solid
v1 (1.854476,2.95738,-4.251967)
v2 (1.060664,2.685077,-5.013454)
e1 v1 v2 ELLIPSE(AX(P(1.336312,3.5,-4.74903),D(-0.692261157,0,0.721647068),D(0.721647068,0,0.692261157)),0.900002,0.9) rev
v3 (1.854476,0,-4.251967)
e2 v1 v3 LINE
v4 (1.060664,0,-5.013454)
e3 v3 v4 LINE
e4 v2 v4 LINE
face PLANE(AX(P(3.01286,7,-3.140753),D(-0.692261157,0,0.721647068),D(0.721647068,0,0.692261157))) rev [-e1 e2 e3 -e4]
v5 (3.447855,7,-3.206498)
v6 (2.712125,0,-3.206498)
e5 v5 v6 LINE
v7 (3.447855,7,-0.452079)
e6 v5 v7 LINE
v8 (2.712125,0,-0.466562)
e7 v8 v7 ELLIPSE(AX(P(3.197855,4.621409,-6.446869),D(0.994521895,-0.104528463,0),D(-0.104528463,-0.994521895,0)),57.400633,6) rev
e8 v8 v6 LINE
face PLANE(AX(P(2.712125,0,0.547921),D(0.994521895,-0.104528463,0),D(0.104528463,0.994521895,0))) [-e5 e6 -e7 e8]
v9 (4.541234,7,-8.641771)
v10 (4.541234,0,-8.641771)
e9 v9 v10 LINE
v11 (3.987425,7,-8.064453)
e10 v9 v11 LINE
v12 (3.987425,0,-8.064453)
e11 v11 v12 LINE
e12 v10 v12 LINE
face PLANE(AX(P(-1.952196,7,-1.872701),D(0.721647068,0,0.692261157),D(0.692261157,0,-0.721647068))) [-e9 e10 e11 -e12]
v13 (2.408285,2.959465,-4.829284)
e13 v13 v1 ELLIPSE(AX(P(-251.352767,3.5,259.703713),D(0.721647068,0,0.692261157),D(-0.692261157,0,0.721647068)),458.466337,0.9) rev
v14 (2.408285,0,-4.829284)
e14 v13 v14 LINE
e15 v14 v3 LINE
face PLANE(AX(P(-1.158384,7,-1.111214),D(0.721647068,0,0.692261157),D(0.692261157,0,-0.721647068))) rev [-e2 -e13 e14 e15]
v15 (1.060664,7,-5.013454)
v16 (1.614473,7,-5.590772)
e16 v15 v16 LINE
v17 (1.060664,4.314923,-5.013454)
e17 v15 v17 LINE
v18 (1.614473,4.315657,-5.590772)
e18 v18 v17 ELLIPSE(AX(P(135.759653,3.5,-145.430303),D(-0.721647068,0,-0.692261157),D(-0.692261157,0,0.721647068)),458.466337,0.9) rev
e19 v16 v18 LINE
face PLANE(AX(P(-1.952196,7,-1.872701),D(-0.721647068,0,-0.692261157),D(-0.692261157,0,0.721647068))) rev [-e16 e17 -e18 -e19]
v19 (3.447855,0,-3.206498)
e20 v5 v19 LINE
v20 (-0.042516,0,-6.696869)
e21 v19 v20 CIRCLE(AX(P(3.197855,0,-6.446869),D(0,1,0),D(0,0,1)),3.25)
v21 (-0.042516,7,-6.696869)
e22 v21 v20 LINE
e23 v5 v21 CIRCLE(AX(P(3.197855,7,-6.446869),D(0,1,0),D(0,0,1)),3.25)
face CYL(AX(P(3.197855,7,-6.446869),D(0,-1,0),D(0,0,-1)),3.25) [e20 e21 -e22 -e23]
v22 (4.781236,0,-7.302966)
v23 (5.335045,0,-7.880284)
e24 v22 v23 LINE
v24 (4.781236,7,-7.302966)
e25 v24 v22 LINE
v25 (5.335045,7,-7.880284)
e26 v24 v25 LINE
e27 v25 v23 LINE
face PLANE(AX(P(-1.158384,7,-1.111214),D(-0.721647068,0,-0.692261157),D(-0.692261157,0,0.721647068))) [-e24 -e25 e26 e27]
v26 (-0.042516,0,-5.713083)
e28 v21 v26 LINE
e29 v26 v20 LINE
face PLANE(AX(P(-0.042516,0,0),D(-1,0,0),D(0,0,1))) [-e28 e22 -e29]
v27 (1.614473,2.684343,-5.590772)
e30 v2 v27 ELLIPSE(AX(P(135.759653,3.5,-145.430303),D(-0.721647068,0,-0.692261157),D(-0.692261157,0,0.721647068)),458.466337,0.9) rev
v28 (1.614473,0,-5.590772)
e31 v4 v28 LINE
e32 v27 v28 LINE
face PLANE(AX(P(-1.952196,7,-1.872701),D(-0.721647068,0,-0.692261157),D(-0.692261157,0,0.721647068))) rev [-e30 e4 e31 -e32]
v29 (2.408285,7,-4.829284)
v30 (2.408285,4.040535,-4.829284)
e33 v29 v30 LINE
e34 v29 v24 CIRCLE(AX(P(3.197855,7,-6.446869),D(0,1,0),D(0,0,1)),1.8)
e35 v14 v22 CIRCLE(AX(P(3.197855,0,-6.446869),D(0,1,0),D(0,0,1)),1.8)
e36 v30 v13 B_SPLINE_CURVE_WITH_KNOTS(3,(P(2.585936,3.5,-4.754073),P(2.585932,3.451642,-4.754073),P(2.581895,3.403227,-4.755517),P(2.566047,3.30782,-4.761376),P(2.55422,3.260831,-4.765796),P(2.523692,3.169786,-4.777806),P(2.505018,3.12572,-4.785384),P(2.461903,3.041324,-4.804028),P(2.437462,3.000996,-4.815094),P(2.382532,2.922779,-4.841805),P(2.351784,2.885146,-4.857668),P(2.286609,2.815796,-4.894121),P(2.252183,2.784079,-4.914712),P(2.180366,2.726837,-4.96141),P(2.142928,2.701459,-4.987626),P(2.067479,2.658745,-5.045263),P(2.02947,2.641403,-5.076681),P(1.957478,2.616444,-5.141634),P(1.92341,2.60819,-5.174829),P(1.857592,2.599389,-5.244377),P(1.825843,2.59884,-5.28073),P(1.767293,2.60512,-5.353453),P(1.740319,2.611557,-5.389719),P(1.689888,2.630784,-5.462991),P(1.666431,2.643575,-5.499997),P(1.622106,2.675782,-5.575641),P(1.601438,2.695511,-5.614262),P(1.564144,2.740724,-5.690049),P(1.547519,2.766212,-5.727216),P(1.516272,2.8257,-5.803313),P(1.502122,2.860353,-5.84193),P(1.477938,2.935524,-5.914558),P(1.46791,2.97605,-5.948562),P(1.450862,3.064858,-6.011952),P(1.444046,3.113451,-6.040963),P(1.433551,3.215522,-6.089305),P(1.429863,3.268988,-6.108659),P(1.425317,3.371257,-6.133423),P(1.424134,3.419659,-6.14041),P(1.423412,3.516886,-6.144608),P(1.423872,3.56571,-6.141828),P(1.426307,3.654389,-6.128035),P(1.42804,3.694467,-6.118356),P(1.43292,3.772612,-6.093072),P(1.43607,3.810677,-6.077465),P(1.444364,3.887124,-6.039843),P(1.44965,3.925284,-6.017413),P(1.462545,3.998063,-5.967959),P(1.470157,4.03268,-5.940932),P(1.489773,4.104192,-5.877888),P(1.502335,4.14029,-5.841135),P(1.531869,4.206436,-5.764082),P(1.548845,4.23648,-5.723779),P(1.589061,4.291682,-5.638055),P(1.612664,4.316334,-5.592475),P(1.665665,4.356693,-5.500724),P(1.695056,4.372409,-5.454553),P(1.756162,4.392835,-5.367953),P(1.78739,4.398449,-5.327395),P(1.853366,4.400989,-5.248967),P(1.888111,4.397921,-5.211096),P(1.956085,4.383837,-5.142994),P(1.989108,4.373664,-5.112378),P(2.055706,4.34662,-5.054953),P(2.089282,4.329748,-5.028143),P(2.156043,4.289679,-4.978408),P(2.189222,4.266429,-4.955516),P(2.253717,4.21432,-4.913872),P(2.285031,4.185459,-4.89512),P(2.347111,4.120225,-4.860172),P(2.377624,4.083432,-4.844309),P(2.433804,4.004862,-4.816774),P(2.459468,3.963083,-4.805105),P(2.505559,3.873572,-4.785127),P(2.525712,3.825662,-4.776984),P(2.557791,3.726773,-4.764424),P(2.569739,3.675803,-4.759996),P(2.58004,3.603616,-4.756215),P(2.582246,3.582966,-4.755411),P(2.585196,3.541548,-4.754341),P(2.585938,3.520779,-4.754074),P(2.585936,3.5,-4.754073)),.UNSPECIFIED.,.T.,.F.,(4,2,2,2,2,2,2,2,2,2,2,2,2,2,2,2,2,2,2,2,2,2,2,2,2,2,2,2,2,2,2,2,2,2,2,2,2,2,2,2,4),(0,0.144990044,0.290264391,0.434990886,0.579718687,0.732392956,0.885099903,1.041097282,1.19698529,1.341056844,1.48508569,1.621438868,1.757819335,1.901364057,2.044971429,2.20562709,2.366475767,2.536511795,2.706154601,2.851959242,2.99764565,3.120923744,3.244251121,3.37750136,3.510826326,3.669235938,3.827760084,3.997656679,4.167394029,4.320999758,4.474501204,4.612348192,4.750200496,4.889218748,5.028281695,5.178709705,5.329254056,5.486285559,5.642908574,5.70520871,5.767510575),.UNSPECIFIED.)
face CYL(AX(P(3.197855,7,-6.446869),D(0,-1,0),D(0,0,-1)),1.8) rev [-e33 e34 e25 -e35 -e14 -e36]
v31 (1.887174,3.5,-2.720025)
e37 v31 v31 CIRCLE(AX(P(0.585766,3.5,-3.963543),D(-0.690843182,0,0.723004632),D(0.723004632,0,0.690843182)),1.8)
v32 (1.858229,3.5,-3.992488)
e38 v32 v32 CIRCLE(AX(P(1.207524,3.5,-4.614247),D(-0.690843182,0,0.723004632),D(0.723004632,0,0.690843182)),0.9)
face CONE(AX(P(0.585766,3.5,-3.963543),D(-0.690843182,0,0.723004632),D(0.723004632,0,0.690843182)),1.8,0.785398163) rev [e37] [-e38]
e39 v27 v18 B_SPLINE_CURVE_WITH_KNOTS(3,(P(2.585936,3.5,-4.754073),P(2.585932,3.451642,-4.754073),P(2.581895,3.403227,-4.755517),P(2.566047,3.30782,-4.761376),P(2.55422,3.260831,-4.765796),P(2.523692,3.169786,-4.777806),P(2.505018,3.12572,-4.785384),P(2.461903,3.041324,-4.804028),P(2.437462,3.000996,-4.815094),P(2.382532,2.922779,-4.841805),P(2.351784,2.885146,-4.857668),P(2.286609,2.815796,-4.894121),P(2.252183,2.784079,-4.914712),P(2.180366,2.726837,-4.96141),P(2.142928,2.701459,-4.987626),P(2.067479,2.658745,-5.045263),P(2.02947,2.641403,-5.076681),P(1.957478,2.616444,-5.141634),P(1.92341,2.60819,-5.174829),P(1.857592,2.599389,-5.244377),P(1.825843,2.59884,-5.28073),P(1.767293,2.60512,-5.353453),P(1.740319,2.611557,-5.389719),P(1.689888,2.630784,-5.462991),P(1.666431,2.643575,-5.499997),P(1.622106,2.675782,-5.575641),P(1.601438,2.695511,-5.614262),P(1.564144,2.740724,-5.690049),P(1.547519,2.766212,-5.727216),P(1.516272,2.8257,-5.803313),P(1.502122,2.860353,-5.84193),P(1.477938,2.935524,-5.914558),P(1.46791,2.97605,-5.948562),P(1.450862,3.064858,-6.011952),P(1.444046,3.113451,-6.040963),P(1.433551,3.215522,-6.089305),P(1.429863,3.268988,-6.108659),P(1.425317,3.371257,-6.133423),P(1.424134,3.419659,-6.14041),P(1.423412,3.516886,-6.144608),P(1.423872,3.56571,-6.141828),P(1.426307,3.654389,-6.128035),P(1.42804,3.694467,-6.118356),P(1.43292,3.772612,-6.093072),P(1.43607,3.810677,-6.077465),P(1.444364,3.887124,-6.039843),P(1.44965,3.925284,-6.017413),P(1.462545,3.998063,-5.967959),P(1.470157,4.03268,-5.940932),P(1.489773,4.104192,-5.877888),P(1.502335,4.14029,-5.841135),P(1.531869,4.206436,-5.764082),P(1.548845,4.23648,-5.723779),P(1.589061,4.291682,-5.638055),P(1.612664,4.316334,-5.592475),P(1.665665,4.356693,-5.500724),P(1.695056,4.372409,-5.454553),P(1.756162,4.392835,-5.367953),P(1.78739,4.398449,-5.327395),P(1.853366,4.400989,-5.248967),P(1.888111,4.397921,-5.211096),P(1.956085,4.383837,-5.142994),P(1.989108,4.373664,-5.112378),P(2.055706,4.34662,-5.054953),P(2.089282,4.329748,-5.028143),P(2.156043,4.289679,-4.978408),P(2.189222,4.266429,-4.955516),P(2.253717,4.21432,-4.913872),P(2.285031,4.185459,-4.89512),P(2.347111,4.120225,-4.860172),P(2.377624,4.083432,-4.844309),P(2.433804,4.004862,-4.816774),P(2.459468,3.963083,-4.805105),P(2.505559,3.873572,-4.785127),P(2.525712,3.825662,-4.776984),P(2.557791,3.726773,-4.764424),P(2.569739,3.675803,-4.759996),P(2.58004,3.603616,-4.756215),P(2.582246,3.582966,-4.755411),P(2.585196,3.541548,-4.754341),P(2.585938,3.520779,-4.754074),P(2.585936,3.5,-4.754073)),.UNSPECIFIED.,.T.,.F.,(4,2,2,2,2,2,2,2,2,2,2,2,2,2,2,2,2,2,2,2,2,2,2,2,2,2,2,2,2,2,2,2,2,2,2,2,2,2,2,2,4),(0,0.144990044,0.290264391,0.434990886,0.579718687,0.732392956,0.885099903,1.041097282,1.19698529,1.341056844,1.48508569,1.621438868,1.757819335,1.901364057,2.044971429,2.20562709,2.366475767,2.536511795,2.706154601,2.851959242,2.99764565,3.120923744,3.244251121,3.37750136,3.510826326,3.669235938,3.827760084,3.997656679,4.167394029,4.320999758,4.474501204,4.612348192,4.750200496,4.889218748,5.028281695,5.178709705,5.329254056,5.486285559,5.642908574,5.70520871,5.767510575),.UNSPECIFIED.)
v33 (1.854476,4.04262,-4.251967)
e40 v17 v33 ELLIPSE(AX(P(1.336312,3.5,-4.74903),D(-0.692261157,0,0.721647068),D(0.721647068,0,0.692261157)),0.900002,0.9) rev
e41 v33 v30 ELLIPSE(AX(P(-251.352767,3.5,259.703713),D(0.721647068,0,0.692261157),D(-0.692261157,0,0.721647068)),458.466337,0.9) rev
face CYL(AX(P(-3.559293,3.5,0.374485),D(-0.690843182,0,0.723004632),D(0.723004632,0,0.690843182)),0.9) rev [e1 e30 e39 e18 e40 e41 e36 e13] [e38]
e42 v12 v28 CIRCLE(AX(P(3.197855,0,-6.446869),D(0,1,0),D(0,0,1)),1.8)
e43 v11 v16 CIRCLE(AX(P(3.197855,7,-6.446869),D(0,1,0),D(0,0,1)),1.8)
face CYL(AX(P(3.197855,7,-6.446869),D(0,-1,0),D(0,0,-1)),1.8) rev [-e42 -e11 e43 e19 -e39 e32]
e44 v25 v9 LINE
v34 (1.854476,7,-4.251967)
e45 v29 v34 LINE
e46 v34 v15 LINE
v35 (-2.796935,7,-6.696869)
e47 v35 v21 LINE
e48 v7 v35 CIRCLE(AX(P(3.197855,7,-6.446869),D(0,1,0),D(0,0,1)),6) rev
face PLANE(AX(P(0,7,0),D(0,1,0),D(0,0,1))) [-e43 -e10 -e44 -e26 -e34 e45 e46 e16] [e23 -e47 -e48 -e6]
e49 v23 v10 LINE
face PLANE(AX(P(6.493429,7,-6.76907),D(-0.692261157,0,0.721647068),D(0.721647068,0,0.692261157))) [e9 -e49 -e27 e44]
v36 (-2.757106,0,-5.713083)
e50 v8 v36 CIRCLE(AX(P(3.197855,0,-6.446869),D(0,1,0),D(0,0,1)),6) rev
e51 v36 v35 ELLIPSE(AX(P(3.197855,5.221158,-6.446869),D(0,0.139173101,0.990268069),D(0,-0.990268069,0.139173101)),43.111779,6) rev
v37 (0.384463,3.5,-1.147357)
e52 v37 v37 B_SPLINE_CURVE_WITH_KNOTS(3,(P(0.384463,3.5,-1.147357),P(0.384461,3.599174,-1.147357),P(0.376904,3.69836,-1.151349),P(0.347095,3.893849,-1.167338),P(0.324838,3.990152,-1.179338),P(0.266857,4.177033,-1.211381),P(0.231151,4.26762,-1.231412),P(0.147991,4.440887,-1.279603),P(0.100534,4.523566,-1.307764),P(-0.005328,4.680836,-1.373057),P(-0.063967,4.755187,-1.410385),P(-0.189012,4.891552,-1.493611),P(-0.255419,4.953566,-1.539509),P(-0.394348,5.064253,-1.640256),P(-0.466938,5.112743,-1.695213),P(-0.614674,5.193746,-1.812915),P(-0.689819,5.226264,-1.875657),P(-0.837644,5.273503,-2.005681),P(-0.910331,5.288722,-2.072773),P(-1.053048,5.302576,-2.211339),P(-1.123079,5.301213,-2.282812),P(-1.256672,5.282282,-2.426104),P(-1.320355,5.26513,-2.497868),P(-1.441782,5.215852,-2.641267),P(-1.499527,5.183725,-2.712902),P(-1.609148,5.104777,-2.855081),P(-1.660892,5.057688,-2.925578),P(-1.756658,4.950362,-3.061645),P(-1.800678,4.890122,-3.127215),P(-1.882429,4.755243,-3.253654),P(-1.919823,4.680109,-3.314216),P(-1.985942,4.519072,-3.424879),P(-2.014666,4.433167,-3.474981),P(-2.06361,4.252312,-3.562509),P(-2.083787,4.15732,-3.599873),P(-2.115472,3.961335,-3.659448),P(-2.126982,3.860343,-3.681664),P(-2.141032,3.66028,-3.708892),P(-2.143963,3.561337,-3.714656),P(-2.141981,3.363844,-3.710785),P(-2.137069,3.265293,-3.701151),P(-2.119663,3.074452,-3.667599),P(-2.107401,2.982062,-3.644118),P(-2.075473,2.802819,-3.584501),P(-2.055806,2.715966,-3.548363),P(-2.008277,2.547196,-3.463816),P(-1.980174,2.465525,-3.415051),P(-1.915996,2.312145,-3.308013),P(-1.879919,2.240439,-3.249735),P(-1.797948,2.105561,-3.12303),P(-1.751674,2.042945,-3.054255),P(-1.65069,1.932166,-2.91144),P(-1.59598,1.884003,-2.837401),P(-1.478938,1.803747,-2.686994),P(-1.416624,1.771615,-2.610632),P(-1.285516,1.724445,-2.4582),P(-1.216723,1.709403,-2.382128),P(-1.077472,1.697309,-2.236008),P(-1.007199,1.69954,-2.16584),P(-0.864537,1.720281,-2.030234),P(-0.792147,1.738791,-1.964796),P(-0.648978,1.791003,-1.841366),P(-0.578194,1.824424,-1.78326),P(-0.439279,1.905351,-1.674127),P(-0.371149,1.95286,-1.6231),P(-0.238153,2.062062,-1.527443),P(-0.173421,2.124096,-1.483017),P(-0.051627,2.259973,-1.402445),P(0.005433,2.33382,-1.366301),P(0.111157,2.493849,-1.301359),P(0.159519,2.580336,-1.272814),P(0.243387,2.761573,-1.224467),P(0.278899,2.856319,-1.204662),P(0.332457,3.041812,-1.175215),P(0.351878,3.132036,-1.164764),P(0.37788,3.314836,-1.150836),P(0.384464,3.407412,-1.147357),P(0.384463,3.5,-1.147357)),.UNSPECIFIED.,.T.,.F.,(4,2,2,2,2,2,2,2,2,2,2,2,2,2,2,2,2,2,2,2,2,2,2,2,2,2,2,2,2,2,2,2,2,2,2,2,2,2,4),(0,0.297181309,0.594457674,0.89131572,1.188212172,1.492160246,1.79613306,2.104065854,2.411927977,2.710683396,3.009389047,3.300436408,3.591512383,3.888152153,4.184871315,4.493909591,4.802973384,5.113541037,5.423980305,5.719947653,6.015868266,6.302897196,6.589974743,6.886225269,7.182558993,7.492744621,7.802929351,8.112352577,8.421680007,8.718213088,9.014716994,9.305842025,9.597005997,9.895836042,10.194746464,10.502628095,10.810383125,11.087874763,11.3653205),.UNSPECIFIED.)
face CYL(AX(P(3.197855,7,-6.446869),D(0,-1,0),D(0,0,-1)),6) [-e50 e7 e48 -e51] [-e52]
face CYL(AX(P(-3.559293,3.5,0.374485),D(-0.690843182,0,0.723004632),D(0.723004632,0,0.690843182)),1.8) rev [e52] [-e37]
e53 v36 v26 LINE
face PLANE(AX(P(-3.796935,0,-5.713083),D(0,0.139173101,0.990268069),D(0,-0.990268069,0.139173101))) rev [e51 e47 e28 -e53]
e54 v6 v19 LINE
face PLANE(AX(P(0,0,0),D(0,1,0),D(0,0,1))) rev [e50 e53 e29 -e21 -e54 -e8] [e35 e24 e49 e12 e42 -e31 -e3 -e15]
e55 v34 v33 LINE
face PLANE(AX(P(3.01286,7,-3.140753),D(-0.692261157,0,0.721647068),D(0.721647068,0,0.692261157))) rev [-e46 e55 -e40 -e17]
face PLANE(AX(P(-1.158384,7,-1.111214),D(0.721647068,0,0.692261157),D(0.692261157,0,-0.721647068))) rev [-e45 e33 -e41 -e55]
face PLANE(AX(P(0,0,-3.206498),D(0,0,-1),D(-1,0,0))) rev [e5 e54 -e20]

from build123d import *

# Parameters (mm, degrees)
MAIN_BODY_DEPTH                        = 7
FLANG_CUT_RIGHT_DEPTH                  = 2.754419
FLANG_CUT_RIGHT_DIRECTION_2_REACH      = 15.268
FLANG_CUT_RIGHT_DIRECTION_2_END_RADIUS = 6
FLANG_CUT_LEFT_DEPTH                   = 2.754419
FLANG_CUT_LEFT_DIRECTION_2_REACH       = 17.116
FLANG_CUT_LEFT_DIRECTION_2_END_RADIUS  = 6
GUIDE_CUTS_DEPTH                       = 14.586908947


# Read off the part's stored shape, not the designer's step: CSK SLOT for M1.6 Countersunk Flat Head Screw9
with BuildPart() as part:
    # Sketch1 → main body (new body)
    with BuildSketch(Plane(origin=(0, 0, 0), x_dir=(1, 0, 0), z_dir=(0, 1, 0))):
        with BuildLine():
            Line((-0.042515674, 6.696868743), (-2.796934729, 6.696868743))
            ThreePointArc((-2.796934729, 6.696868743), (-1.044786012, 2.204228056), (3.447854676, 0.452079339))
            Line((3.447854676, 0.452079339), (3.447854676, 3.206498394))
            ThreePointArc((3.447854676, 3.206498394), (0.899757637, 4.148771704), (-0.042515674, 6.696868743))
        make_face()
        with BuildLine():
            Line((1.415300329, 6.696868743), (-0.042515674, 6.696868743))
            ThreePointArc((-0.042515674, 6.696868743), (0.899757637, 4.148771704), (3.447854676, 3.206498394))
            Line((3.447854676, 3.206498394), (3.447854676, 4.664314396))
            ThreePointArc((3.447854676, 4.664314396), (1.925062469, 5.174076537), (1.415300329, 6.696868743))
        make_face()
        with BuildLine():
            ThreePointArc((6.447854676, 6.446868743), (3.322947371, 9.694460438), (-0.042515674, 6.696868743))
            Line((-0.042515674, 6.696868743), (1.415300329, 6.696868743))
            ThreePointArc((1.415300329, 6.696868743), (1.907300469, 7.701647544), (2.897854676, 8.221692678))
            ThreePointArc((2.897854676, 8.221692678), (4.470646882, 7.719660949), (4.972678611, 6.146868743))
            ThreePointArc((4.972678611, 6.146868743), (4.452633477, 5.156314537), (3.447854676, 4.664314396))
            Line((3.447854676, 4.664314396), (3.447854676, 3.206498394))
            ThreePointArc((3.447854676, 3.206498394), (5.582702679, 4.238928527), (6.447854676, 6.446868743))
        make_face()
    extrude(amount=MAIN_BODY_DEPTH)

    # Sketch15 → flang cut right (cut)
    with BuildSketch(Plane(origin=(0, 0, -0.452079339), x_dir=(0, -1, 0), z_dir=(0, 0, 1))):
        Polygon((0, 3.447854676), (0, 2.712125029), (-7, 3.447854676), align=None)
    extrude(amount=-FLANG_CUT_RIGHT_DEPTH, mode=Mode.SUBTRACT)

    # flang cut right direction 2: up to this cylinder (the profile starts inside it)
    flang_cut_right_direction_2_end = Plane(origin=(3.197854676, 2.333333, -6.446868743), z_dir=(0, -1, 0)) * Cylinder(FLANG_CUT_RIGHT_DIRECTION_2_END_RADIUS, 43.536, mode=Mode.PRIVATE)
    # Sketch15 → flang cut right direction 2 (cut, up to the surface)
    with BuildSketch(Plane(origin=(0, 0, -0.452079339), x_dir=(0, -1, 0), z_dir=(0, 0, 1)), mode=Mode.PRIVATE) as flang_cut_right_direction_2_sk1:
        Polygon((0, 3.447854676), (0, 2.712125029), (-7, 3.447854676), align=None)
    flang_cut_right_direction_2_tool1 = extrude(flang_cut_right_direction_2_sk1.sketch, amount=FLANG_CUT_RIGHT_DIRECTION_2_REACH, mode=Mode.PRIVATE) & flang_cut_right_direction_2_end
    add(flang_cut_right_direction_2_tool1.solids().sort_by_distance((3.202611, 2.333333, -0.452079))[0], mode=Mode.SUBTRACT)

    # Sketch13 → flang cut left (cut)
    with BuildSketch(Plane(origin=(-2.796934729, 0, 0), x_dir=(0, 0, -1), z_dir=(1, 0, 0))):
        Polygon((6.696868743, 0), (6.696868743, 7), (5.7130829, 0), align=None)
    extrude(amount=FLANG_CUT_LEFT_DEPTH, mode=Mode.SUBTRACT)

    # flang cut left direction 2: up to this cylinder (the profile starts inside it)
    flang_cut_left_direction_2_end = Plane(origin=(3.197854676, 2.333333, -6.446868743), z_dir=(0, -1, 0)) * Cylinder(FLANG_CUT_LEFT_DIRECTION_2_END_RADIUS, 47.232, mode=Mode.PRIVATE)
    # Sketch13 → flang cut left direction 2 (cut, up to the surface)
    with BuildSketch(Plane(origin=(-2.796934729, 0, 0), x_dir=(0, 0, -1), z_dir=(1, 0, 0)), mode=Mode.PRIVATE) as flang_cut_left_direction_2_sk1:
        Polygon((6.696868743, 0), (6.696868743, 7), (5.7130829, 0), align=None)
    flang_cut_left_direction_2_tool1 = extrude(flang_cut_left_direction_2_sk1.sketch, amount=-FLANG_CUT_LEFT_DIRECTION_2_REACH, mode=Mode.PRIVATE) & flang_cut_left_direction_2_end
    add(flang_cut_left_direction_2_tool1.solids().sort_by_distance((-2.796935, 2.333333, -6.36894))[0], mode=Mode.SUBTRACT)

    # CSK SLOT for M1.6 Countersunk Flat H 2 → CSK SLOT for M1.6 Countersunk Flat Head Screw9 (revolve, cut)
    with BuildSketch(Plane(origin=(-1.673520994, 3.5, -1.59907768), x_dir=(0.723004631868789, 0, 0.6908431821305592), z_dir=(0, 1, 0))):
        Polygon((0.9, 4.170332063), (0.9, 5.425223714), (0, 5.425223714), (0, 0.870183673), (1.8, 0.870183673), (1.8, 3.270332063), align=None)
    revolve(axis=Axis((-1.673520994, 3.5, -1.59907768), (0.6908431821305593, 0, -0.7230046318687892)), mode=Mode.SUBTRACT)

    # Sketch11 → guide cuts (cut, through all)
    with BuildSketch(Plane.XZ):
        with BuildLine():
            Line((1.060664016, -5.013453966), (1.614472941, -5.59077162))
            ThreePointArc((1.614472941, -5.59077162), (1.951784592, -5.147904022), (2.408284716, -4.829284347))
            Line((2.408284716, -4.829284347), (1.85447579, -4.251966693))
            Line((1.85447579, -4.251966693), (1.060664016, -5.013453966))
        make_face()
        with BuildLine():
            Line((5.335045336, -7.88028352), (4.78123641, -7.302965866))
            ThreePointArc((4.78123641, -7.302965866), (4.443924759, -7.745833465), (3.987424635, -8.064453139))
            Line((3.987424635, -8.064453139), (4.541233561, -8.641770793))
            Line((4.541233561, -8.641770793), (5.335045336, -7.88028352))
        make_face()
    extrude(amount=-GUIDE_CUTS_DEPTH, mode=Mode.SUBTRACT)


solid = part.part
